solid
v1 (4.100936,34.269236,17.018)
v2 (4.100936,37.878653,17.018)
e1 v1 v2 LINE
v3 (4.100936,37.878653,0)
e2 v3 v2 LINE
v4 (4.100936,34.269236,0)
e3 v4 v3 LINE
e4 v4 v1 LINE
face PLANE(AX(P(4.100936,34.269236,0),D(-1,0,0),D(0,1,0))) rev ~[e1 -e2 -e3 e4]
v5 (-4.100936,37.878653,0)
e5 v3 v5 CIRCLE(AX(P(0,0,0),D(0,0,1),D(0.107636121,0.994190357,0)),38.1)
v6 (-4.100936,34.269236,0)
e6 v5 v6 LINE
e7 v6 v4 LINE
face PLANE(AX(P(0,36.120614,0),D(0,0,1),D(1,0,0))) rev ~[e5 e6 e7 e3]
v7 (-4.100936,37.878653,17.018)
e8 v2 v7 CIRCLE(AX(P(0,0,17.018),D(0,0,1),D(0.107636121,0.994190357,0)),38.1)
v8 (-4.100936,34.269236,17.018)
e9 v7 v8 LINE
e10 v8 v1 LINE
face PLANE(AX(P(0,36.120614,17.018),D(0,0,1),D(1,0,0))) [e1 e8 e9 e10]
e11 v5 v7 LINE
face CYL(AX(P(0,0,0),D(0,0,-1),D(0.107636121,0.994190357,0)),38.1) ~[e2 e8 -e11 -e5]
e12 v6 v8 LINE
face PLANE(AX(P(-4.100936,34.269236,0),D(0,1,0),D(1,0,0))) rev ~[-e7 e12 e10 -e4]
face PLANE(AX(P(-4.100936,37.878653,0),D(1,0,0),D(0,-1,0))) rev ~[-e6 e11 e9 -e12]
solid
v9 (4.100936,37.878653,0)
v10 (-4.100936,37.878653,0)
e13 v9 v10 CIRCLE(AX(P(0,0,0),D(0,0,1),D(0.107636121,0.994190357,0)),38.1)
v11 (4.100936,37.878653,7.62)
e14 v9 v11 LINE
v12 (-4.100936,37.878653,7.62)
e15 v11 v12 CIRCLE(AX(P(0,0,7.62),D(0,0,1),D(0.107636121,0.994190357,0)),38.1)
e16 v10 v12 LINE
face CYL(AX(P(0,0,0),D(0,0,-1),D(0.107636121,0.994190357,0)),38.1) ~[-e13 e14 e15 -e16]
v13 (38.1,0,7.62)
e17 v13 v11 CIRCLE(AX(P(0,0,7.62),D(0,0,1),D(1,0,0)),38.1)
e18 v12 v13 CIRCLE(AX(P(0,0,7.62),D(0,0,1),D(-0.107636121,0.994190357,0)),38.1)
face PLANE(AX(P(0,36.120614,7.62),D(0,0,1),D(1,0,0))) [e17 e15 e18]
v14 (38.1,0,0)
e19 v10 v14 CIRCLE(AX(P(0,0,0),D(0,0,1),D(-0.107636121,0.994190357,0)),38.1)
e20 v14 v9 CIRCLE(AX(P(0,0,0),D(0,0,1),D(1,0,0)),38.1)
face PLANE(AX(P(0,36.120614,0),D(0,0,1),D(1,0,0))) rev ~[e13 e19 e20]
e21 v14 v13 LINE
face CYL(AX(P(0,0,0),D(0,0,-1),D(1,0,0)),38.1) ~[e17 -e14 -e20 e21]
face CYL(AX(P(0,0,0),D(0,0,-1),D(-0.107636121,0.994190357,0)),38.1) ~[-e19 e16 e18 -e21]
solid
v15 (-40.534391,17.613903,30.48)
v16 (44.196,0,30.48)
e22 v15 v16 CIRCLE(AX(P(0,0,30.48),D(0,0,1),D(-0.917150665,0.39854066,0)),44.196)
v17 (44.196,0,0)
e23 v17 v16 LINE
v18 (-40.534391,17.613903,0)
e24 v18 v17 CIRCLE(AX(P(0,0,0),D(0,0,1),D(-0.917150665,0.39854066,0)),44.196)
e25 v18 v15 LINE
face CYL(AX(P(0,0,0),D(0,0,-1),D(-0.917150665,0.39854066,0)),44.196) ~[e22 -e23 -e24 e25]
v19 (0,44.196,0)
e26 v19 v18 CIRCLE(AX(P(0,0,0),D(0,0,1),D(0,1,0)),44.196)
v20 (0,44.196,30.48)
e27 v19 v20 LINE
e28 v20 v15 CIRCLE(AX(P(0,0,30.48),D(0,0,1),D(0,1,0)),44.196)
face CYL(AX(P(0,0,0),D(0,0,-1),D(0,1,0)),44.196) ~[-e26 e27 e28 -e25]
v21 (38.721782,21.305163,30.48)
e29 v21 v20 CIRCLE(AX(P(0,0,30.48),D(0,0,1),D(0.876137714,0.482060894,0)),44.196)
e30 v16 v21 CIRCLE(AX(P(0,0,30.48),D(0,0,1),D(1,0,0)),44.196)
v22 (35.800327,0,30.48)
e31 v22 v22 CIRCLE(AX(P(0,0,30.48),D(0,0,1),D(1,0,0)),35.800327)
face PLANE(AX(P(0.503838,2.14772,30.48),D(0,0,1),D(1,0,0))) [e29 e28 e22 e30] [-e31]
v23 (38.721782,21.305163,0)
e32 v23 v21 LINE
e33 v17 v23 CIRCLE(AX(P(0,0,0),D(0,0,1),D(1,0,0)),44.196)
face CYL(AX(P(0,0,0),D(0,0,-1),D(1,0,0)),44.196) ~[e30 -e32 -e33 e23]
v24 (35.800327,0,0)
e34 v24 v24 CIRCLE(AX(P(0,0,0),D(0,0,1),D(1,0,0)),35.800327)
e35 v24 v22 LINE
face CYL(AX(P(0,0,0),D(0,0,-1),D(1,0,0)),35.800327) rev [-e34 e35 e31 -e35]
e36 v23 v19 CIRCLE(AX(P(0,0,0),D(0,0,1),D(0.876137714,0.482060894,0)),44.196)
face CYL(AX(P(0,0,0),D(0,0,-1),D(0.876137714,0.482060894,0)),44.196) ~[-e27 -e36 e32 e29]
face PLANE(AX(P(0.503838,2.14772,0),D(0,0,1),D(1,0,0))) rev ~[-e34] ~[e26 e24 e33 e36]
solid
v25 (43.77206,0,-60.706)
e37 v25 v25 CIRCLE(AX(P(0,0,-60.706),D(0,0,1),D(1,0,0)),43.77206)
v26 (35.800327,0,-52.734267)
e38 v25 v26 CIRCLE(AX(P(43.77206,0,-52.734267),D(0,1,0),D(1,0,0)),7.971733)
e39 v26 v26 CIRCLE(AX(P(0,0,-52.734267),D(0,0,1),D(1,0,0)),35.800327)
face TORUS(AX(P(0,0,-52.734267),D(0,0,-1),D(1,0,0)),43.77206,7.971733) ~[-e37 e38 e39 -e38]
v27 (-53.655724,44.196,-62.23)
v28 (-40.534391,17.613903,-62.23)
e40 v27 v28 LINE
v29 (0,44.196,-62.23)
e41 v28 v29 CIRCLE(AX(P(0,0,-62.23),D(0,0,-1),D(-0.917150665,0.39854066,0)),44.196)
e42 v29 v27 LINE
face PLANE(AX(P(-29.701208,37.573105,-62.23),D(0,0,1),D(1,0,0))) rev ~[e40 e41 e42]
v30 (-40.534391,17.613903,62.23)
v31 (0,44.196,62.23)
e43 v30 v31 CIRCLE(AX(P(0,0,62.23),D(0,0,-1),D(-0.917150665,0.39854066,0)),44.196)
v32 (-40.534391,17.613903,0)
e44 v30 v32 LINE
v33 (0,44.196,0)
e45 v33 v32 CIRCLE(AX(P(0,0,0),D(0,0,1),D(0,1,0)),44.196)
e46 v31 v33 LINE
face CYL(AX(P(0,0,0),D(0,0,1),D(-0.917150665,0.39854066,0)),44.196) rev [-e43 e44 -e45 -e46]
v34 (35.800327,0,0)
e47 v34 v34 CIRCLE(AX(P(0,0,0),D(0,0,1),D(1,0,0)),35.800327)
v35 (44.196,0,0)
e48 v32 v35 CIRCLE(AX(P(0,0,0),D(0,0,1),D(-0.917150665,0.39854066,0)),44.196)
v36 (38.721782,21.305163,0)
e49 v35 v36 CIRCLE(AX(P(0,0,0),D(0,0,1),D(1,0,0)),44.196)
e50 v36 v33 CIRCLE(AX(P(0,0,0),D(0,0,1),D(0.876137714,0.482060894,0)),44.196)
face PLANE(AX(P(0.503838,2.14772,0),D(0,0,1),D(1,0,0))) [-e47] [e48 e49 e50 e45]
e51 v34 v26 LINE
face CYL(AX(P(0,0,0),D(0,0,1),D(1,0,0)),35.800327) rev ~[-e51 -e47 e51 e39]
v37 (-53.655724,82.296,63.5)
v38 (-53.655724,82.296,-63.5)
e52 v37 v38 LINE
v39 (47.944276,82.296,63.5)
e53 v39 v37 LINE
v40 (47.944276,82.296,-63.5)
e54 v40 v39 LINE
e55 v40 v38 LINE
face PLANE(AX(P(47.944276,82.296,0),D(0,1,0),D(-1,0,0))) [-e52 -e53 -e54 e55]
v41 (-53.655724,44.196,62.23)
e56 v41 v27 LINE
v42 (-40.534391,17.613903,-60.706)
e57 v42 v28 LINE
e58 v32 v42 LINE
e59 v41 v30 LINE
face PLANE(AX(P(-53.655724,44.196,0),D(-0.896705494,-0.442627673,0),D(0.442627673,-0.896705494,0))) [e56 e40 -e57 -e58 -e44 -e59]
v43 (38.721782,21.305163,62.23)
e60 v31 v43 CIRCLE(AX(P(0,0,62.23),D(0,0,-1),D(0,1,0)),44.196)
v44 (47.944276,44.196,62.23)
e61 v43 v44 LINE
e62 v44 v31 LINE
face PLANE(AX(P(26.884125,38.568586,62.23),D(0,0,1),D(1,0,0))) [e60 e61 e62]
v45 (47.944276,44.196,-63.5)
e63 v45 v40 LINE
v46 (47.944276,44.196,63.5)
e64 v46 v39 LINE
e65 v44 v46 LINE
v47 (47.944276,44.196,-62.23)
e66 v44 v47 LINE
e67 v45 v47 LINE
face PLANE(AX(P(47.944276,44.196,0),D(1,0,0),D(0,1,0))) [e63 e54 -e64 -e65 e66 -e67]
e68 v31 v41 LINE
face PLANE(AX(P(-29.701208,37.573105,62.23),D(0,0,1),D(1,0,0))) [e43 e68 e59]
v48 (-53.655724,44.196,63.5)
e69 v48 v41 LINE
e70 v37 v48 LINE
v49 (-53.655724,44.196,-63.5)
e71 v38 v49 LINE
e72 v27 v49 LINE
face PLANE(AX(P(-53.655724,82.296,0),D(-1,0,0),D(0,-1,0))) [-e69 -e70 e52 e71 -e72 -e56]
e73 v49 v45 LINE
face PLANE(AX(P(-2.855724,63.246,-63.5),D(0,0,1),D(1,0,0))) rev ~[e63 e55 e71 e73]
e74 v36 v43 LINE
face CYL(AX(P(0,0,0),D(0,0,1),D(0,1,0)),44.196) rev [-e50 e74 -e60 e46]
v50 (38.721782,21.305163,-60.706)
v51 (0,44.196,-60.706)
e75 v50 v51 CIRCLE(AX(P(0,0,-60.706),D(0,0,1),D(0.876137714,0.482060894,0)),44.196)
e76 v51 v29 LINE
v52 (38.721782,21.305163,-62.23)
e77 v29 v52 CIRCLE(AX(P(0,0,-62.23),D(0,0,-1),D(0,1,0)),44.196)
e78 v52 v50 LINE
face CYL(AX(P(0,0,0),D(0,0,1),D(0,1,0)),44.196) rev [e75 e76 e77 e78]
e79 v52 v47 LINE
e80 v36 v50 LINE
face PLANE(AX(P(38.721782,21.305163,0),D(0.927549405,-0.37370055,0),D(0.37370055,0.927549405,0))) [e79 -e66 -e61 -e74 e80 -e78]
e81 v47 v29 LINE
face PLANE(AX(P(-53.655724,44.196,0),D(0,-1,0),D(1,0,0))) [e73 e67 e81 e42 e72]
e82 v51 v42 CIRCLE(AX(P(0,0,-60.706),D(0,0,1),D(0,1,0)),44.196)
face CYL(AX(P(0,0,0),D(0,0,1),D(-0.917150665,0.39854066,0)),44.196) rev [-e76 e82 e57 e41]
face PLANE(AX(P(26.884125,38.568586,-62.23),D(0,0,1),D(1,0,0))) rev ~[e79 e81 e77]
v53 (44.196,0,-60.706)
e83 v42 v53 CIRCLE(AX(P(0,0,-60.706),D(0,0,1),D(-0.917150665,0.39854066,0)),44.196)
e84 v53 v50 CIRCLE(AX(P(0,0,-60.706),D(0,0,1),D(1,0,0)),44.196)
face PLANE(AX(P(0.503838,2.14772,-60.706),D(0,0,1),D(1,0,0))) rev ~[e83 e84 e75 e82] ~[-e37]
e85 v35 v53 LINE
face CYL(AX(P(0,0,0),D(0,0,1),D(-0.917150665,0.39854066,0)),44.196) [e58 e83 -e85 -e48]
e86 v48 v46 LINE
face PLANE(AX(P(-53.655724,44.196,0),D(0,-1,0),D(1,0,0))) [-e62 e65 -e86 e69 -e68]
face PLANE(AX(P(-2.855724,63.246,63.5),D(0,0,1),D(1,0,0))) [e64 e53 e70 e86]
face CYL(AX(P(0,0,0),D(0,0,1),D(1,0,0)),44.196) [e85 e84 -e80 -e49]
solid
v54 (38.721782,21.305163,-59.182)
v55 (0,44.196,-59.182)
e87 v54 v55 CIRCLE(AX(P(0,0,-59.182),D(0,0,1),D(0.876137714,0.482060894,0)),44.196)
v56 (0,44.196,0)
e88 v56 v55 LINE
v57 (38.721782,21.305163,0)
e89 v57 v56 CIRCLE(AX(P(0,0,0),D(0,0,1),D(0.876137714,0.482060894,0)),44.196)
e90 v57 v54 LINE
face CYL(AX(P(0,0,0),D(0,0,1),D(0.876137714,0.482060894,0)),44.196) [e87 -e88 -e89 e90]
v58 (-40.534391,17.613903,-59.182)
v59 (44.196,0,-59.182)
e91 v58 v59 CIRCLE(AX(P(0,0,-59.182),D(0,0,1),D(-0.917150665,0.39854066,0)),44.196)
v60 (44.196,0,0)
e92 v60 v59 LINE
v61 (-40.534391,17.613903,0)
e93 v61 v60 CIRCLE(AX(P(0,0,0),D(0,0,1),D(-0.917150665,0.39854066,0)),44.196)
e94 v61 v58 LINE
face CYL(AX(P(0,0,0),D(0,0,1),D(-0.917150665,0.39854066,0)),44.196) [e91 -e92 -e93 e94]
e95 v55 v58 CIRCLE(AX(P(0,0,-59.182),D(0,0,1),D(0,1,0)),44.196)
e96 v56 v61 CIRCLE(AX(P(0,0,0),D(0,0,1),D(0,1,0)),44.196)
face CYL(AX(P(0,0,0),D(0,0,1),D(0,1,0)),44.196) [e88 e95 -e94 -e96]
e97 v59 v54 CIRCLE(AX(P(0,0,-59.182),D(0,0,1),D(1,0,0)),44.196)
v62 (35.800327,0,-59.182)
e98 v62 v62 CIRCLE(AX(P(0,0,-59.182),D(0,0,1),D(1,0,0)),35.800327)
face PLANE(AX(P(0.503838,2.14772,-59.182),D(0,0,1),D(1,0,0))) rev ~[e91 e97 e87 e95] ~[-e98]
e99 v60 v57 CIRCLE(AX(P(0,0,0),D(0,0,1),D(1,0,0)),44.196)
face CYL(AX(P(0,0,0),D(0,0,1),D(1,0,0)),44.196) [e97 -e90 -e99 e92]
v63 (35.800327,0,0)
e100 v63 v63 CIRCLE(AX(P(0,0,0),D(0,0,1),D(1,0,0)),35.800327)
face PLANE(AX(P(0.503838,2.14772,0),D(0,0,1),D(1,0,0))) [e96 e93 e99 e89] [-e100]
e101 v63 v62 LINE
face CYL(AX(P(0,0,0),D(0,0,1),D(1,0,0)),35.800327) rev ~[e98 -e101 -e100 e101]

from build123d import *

# Parameters (mm, degrees)
F1_DEPTH = 63.5
F2_DEPTH = 62.23
F0_R     = 35.8003270569
F3_DEPTH = 60.706
F4_R     = 7.971733183
F6_DEPTH = 7.62
F7_DEPTH = 17.018
F8_DEPTH = 30.48
F9_DEPTH = 59.182


with BuildPart() as f1:
    # F0 (on Top) → F1 (new body, symmetric)
    with BuildSketch(Plane.XY):
        Polygon((-53.6557241526, 44.196), (0, 44.196), (47.9442758474, 44.196), (47.9442758474, 82.296), (-53.6557241526, 82.296), align=None)
    extrude(amount=F1_DEPTH, both=True)

    # F0 (on Top) → F2 (join, symmetric)
    with BuildSketch(Plane.XY):
        with BuildLine():
            Line((-53.6557241526, 44.196), (-40.5343907854, 17.6139030216))
            ThreePointArc((-40.5343907854, 17.6139030216), (-24.2365669811, 36.9577493494), (0, 44.196))
            Line((0, 44.196), (-53.6557241526, 44.196))
        make_face()
        with BuildLine():
            ThreePointArc((0, 44.196), (22.4909250619, 38.0452980782), (38.7217824253, 21.3051632664))
            Line((38.7217824253, 21.3051632664), (47.9442758474, 44.196))
            Line((47.9442758474, 44.196), (0, 44.196))
        make_face()
    extrude(amount=F2_DEPTH, both=True)

    # F0 (on Top) → F3 (join)
    with BuildSketch(Plane.XY):
        with BuildLine():
            ThreePointArc((-40.5343907854, 17.6139030216), (-8.9952343173, -43.2709160473), (44.196, 0))
            ThreePointArc((44.196, 0), (42.8055738898, 10.998602637), (38.7217824253, 21.3051632664))
            ThreePointArc((38.7217824253, 21.3051632664), (22.4909250619, 38.0452980782), (0, 44.196))
            ThreePointArc((0, 44.196), (-24.2365669811, 36.9577493494), (-40.5343907854, 17.6139030216))
        make_face()
        Circle(F0_R, mode=Mode.SUBTRACT)
    extrude(amount=-F3_DEPTH)

    # F4
    f4_edges = [f1.edges().sort_by_distance(p)[0] for p in [
        (-35.800327, 0, -60.706),
    ]]
    fillet(f4_edges, radius=F4_R)


with BuildPart() as f6:
    # F5 (on Top) → F6 (new body)
    with BuildSketch(Plane.XY):
        with BuildLine():
            Line((4.1009361986, 34.2692360282), (4.1009361986, 37.8786525935))
            ThreePointArc((4.1009361986, 37.8786525935), (0, 38.1), (-4.1009361986, 37.8786525935))
            Line((-4.1009361986, 37.8786525935), (-4.1009361986, 34.2692360282))
            Line((-4.1009361986, 34.2692360282), (4.1009361986, 34.2692360282))
        make_face()
        with BuildLine():
            ThreePointArc((-4.1009361986, 37.8786525935), (-25.4496004962, -28.3536211899), (38.1, 0))
            ThreePointArc((38.1, 0), (28.3536211899, 25.4496004962), (4.1009361986, 37.8786525935))
            Line((4.1009361986, 37.8786525935), (4.1009361986, 34.2692360282))
            Line((4.1009361986, 34.2692360282), (-4.1009361986, 34.2692360282))
            Line((-4.1009361986, 34.2692360282), (-4.1009361986, 37.8786525935))
        make_face()
    extrude(amount=F6_DEPTH)


with BuildPart() as f7:
    # F5 (on Top) → F7 (new body)
    with BuildSketch(Plane.XY):
        with BuildLine():
            Line((4.1009361986, 34.2692360282), (4.1009361986, 37.8786525935))
            ThreePointArc((4.1009361986, 37.8786525935), (0, 38.1), (-4.1009361986, 37.8786525935))
            Line((-4.1009361986, 37.8786525935), (-4.1009361986, 34.2692360282))
            Line((-4.1009361986, 34.2692360282), (4.1009361986, 34.2692360282))
        make_face()
    extrude(amount=F7_DEPTH)


with BuildPart() as f8:
    # F0 (on Top) → F8 (new body)
    with BuildSketch(Plane.XY):
        with BuildLine():
            ThreePointArc((-40.5343907854, 17.6139030216), (-8.9952343173, -43.2709160473), (44.196, 0))
            ThreePointArc((44.196, 0), (42.8055738898, 10.998602637), (38.7217824253, 21.3051632664))
            ThreePointArc((38.7217824253, 21.3051632664), (22.4909250619, 38.0452980782), (0, 44.196))
            ThreePointArc((0, 44.196), (-24.2365669811, 36.9577493494), (-40.5343907854, 17.6139030216))
        make_face()
        Circle(F0_R, mode=Mode.SUBTRACT)
    extrude(amount=F8_DEPTH)


with BuildPart() as f9:
    # F0 (on Top) → F9 (new body)
    with BuildSketch(Plane.XY):
        with BuildLine():
            ThreePointArc((-40.5343907854, 17.6139030216), (-8.9952343173, -43.2709160473), (44.196, 0))
            ThreePointArc((44.196, 0), (42.8055738898, 10.998602637), (38.7217824253, 21.3051632664))
            ThreePointArc((38.7217824253, 21.3051632664), (22.4909250619, 38.0452980782), (0, 44.196))
            ThreePointArc((0, 44.196), (-24.2365669811, 36.9577493494), (-40.5343907854, 17.6139030216))
        make_face()
        Circle(F0_R, mode=Mode.SUBTRACT)
    extrude(amount=-F9_DEPTH)


solid = Compound([f1.part, f6.part, f7.part, f8.part, f9.part])
